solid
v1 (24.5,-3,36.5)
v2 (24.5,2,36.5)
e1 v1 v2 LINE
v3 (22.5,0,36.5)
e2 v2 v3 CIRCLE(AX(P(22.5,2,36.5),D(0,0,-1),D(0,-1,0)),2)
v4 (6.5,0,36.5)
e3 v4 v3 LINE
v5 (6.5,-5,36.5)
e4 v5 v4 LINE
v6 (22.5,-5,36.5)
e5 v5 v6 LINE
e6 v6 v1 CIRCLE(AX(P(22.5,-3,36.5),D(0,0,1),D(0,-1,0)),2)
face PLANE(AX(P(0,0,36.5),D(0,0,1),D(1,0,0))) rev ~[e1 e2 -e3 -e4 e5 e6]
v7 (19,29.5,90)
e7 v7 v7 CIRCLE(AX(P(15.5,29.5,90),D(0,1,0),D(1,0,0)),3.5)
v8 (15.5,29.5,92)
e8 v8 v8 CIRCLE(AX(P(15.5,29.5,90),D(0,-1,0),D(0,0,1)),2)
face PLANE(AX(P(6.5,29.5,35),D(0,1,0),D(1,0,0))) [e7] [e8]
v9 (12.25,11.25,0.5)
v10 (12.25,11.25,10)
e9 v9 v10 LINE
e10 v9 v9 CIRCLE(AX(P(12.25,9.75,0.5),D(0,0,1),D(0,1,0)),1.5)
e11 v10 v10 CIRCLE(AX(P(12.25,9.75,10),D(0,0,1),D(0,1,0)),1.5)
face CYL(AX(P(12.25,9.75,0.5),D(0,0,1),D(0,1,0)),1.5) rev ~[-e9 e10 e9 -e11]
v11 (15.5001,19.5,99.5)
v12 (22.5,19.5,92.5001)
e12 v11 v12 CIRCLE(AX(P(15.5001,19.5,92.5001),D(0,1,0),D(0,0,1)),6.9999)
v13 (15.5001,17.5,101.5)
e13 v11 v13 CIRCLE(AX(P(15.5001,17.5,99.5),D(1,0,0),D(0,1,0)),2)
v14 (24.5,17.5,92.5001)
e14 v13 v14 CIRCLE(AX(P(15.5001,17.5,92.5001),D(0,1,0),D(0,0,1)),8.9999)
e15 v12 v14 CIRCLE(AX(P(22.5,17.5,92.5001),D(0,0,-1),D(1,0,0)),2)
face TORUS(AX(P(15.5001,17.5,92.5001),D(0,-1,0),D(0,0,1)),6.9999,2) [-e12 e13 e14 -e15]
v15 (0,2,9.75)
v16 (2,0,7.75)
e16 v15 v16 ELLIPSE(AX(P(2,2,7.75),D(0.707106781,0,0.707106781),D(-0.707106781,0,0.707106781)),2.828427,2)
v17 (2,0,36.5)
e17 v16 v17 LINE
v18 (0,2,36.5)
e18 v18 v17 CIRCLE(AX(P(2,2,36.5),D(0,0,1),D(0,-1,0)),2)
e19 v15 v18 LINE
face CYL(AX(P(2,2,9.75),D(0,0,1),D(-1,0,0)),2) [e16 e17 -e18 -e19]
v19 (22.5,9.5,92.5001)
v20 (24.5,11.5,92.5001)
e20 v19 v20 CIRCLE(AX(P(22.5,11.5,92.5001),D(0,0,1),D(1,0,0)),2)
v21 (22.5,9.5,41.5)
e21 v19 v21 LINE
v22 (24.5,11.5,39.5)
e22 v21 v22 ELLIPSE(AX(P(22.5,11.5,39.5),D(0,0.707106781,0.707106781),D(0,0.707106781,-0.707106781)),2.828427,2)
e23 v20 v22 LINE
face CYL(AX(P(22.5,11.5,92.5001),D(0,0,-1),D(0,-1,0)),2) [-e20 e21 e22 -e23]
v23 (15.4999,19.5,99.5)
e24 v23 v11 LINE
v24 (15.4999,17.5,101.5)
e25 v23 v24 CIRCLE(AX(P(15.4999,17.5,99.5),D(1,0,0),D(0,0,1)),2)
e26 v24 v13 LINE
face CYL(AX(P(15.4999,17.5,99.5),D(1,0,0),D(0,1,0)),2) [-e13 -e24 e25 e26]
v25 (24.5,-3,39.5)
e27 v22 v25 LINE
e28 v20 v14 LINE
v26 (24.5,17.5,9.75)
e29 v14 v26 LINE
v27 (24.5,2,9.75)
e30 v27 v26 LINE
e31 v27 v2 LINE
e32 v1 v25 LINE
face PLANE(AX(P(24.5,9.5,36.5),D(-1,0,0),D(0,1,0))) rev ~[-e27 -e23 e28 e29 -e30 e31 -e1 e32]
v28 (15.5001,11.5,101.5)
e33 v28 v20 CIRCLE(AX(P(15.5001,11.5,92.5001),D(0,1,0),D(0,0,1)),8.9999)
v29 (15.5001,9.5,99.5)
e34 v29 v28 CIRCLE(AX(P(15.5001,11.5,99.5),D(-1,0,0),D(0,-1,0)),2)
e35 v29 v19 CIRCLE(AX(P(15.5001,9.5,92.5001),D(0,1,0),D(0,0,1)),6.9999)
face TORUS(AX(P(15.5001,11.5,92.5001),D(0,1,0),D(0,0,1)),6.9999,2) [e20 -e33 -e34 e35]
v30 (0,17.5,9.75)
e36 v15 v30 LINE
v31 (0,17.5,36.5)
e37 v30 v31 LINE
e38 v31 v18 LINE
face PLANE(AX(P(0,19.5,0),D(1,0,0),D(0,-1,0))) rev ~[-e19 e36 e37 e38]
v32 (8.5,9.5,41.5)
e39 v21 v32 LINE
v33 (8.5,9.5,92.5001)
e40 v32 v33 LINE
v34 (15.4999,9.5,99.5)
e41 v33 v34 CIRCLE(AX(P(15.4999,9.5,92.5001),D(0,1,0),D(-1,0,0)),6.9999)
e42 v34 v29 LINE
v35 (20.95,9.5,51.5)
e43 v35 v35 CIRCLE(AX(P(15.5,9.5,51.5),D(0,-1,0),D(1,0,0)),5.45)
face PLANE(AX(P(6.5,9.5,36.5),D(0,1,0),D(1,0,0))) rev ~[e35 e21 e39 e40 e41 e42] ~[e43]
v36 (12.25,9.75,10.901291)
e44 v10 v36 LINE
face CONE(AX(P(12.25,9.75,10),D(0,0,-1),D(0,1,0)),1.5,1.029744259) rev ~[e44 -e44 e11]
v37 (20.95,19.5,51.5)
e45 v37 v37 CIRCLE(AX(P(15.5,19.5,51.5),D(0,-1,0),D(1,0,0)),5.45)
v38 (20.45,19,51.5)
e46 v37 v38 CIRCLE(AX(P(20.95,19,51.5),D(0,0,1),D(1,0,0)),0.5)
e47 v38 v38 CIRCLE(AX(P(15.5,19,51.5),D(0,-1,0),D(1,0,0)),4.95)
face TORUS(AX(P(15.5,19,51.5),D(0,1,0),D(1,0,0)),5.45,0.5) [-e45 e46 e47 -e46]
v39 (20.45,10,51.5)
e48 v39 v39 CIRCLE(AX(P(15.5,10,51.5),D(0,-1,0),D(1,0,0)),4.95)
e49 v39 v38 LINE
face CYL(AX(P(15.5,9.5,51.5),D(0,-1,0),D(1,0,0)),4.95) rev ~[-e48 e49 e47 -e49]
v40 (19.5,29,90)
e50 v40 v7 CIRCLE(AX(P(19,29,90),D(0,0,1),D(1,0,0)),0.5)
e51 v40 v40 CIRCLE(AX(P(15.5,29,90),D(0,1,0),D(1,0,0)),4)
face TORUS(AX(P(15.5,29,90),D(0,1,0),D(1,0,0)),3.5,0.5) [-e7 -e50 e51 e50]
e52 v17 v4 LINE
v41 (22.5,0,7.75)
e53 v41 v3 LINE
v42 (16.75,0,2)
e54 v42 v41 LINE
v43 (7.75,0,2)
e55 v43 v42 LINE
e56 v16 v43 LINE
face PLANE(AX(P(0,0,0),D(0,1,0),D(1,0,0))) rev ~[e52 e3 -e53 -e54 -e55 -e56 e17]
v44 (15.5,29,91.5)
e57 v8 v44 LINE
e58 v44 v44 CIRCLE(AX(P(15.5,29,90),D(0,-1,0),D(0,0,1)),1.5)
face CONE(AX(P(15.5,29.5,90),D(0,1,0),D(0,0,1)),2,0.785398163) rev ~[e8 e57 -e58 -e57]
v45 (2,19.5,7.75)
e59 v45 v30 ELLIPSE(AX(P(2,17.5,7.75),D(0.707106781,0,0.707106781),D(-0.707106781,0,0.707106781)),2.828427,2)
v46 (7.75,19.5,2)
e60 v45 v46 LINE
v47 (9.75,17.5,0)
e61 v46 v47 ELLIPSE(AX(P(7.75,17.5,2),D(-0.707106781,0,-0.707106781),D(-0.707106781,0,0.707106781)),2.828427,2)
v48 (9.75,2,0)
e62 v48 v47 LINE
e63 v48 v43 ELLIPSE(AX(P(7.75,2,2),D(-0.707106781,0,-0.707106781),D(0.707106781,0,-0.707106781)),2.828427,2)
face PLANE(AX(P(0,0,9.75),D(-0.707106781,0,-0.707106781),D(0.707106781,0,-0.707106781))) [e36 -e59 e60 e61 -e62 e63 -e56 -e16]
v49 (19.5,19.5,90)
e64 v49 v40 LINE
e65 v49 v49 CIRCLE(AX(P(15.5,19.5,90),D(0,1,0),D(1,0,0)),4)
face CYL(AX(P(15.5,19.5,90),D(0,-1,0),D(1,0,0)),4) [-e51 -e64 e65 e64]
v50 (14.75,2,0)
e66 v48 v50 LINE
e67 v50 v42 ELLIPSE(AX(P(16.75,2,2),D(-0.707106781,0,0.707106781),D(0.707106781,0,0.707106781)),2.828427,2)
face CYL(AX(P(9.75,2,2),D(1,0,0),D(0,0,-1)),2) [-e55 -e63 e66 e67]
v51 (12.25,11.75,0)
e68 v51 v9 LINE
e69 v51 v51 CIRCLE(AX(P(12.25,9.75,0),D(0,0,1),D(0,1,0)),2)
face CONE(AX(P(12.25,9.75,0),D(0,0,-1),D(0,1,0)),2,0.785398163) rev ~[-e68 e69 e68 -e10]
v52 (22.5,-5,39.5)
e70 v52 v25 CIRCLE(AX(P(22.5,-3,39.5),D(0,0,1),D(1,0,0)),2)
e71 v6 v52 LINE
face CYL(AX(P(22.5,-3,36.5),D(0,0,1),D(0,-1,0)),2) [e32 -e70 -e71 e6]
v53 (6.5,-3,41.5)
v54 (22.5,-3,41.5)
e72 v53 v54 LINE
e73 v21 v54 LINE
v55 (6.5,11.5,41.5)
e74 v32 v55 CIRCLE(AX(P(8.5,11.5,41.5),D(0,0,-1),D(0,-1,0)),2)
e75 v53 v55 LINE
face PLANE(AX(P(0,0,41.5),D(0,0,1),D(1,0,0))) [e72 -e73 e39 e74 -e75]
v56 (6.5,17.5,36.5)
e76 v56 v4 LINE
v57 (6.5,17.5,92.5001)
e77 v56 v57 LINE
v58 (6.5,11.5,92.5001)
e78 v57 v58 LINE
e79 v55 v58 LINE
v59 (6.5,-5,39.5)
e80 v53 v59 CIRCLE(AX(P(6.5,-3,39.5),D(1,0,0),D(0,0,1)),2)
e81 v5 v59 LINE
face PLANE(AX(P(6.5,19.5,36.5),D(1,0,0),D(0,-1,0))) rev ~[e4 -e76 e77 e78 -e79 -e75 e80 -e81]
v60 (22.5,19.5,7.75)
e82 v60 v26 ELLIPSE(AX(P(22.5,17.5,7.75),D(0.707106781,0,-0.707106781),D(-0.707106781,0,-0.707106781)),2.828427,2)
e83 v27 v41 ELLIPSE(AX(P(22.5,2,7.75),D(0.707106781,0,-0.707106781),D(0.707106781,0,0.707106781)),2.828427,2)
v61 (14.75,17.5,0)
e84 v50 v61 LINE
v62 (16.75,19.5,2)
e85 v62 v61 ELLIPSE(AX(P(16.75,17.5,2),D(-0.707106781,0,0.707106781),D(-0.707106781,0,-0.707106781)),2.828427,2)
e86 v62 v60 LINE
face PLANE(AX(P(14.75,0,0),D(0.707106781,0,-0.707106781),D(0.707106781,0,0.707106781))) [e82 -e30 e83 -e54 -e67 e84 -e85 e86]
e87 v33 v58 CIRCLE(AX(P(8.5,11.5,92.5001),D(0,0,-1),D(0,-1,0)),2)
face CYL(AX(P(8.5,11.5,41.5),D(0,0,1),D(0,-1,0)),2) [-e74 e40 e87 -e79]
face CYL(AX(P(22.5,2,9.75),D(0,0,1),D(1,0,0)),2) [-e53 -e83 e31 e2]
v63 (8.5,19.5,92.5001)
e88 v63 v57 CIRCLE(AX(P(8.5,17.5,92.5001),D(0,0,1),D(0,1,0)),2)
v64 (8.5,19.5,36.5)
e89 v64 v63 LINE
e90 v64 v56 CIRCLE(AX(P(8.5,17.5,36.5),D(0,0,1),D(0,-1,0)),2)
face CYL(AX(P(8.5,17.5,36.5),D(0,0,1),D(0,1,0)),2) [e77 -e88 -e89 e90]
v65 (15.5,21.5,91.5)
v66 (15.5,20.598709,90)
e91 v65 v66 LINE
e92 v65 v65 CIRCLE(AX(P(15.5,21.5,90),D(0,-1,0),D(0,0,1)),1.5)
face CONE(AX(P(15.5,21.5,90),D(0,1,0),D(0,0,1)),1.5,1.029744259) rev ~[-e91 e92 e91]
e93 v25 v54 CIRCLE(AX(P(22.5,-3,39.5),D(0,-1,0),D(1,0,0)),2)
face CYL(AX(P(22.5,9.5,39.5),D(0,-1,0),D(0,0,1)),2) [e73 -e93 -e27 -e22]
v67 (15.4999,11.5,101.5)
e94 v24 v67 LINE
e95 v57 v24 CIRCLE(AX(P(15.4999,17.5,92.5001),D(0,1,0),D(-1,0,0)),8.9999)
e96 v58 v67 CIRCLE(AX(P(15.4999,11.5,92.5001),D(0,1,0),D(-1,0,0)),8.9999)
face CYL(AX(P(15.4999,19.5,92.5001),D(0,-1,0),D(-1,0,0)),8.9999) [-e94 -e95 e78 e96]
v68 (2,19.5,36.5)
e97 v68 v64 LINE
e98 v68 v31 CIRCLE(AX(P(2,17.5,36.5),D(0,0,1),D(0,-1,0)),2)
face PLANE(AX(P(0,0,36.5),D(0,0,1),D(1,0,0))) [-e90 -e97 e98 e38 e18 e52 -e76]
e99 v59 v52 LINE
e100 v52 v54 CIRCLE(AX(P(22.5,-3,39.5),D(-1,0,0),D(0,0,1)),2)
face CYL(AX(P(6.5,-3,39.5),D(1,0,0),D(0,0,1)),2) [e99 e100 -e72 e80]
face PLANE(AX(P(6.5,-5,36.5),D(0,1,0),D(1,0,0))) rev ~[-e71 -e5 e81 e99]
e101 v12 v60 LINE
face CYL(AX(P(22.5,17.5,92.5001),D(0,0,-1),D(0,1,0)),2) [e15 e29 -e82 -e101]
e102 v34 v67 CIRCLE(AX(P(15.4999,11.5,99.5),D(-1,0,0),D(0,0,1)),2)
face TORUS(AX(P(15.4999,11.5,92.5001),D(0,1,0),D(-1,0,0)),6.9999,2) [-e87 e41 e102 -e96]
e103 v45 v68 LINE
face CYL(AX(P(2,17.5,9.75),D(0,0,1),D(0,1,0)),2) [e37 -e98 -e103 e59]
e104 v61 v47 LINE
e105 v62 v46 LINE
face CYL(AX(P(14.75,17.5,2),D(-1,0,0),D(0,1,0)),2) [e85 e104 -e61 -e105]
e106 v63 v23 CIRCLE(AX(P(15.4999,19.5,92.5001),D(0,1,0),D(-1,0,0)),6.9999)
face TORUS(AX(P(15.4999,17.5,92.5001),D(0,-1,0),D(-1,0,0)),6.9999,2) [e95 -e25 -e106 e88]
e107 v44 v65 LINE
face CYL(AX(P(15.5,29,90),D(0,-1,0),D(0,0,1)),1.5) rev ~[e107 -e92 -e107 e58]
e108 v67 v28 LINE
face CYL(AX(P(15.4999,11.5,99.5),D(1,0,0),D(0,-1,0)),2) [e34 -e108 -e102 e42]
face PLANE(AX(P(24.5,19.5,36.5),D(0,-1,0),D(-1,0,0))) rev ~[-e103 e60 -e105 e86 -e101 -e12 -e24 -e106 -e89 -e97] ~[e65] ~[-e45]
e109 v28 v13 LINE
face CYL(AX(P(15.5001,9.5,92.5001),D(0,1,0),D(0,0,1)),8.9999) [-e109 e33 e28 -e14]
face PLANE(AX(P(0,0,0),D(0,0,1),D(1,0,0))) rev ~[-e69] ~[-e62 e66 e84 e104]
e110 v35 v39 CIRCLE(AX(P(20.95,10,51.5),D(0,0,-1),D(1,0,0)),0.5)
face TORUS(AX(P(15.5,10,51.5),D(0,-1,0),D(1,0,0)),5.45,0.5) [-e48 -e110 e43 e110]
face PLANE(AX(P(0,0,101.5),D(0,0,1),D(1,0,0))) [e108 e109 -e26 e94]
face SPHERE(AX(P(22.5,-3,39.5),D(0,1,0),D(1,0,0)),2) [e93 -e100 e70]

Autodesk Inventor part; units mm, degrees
ref_plane "YZ Plane" through (0, 0, 0) normal (1, 0, 0) x (0, 1, 0)
ref_plane "XZ Plane" through (0, 0, 0) normal (0, 1, 0) x (-1, 0, 0)
ref_plane "XY Plane" through (0, 0, 0) normal (0, 0, 1) x (1, 0, 0)
sketch "Sketch1" plane through (0, 0, 0) normal (0, 0, 1) x (1, 0, 0)
  line L0 (0, 0) -> (24.5, 0)
  line L1 (24.5, 0) -> (24.5, 19.5)
  line L2 (24.5, 19.5) -> (0, 19.5)
  line L3 (0, 19.5) -> (0, 0)
  dimension "d0" = 19.5
  dimension "d1" = 24.5
extrude "Extrusion1" add sketch "Sketch1" along normal blind 36.5
sketch "Sketch12" plane through (0, 0, 0) normal (0, -1, 0) x (1, 0, 0)
  line L0 (24.5, 0) -> (24.5, 36.5) projected
  line L1 (0, 0) -> (0, 36.5) projected
  line L2 (24.5, 0) -> (24.5, 36.5) projected
  line L3 (24.5, 9.75) -> (24.5, 0)
  line L4 (0, 0) -> (24.5, 0) projected
  line L5 (14.75, 0) -> (24.5, 9.75)
  line L6 (0, 0) -> (0, 36.5) projected
  line L7 (0, 9.75) -> (9.75, 0)
  line L8 (9.75, 0) -> (0, 0)
  line L9 (0, 0) -> (0, 9.75)
  dimension "d75" = 5
  dimension "d76" = 45
  dimension "d77" = 45
  dimension "d79" = 9.75
extrude "Extrusion10" cut sketch "Sketch12" against normal through all
sketch "Sketch2" plane through (0, 0, 36.5) normal (0, 0, 1) x (1, 0, 0)
  line L0 (6.5, 9.5) -> (24.5, 9.5)
  line L1 (24.5, 9.5) -> (24.5, 19.5)
  line L2 (24.5, 19.5) -> (6.5, 19.5)
  line L3 (6.5, 19.5) -> (6.5, 9.5)
  line L4 (0, 0) -> (24.5, 0) projected
  line L5 (24.5, 0) -> (24.5, 19.5) projected
  line L6 (24.5, 19.5) -> (0, 19.5) projected
  dimension "d4" = 10
  dimension "d6" = 18
extrude "Extrusion2" add sketch "Sketch2" along normal blind 65
sketch "Sketch3" plane through (6.5, 9.5, 36.5) normal (0, -1, 0) x (1, 0, 0)
  circle A0 centre (9, 15) radius 4.95
  line L0 (18, 0) -> (18, 65) projected
  line L1 (18, 0) -> (0, 0) projected
  line L2 (0, 65) -> (18, 65) projected
  point P0 (-6.5, -36.5)
  point P1 (9, 65)
  dimension "d9" = 9.9
  dimension "d11" = 15
extrude "Extrusion3" cut sketch "Sketch3" against normal up to next
sketch "Sketch9" plane through (6.5, 19.5, 35) normal (0, 1, 0) x (1, 0, 0)
  circle A0 centre (9, -55) radius 4
  line L0 (18, -66.5) -> (0, -66.5) projected
  line L1 (18, 0) -> (0, 0) projected
  point P0 (-6.5, 35)
  point P1 (9, -66.5)
  dimension "d42" = 8
  dimension "d43" = 55
extrude "Extrusion9" add sketch "Sketch9" along normal blind 10
sketch "Sketch14" plane through (0, 0, 36.5) normal (0, 0, 1) x (1, 0, 0)
  line L0 (24.5, 9.5) -> (6.5, 9.5) projected
  line L1 (24.5, 9.5) -> (6.5, 9.5)
  line L2 (6.5, 9.5) -> (6.5, -5)
  line L3 (6.5, -5) -> (24.5, -5)
  line L4 (24.5, -5) -> (24.5, 9.5)
  line L5 (6.5, 9.5) -> (6.5, 19.5) projected
  line L6 (0, 0) -> (24.5, 0) projected
  dimension "d89" = 5
extrude "Extrusion11" add sketch "Sketch14" along normal blind 5
fillet "Fillet3" radius 9 2 edges at (24.5, 14.5, 101.5) (6.5, 14.5, 101.5)
fillet "Fillet1" radius 2 15 edges at (12.25, 0, 0) (24.5, 0, 23.125) (0, 0, 23.125) (0, 19.5, 23.125) (12.25, 19.5, 0) (21.864, 19.5, 98.864) (9.136, 19.5, 98.864) (6.5, 19.5, 64.5001) (21.864, 9.5, 98.864) (15.5, 9.5, 101.5) (24.5, 9.5, 67.0001) (6.5, 9.5, 67.0001) (24.5, 2.25, 41.5) (24.5, -5, 39) (15.5, -5, 41.5)
fillet "Fillet5" radius 0.5 2 edges at (10.55, 9.5, 51.5) (10.55, 19.5, 51.5)
fillet "Fillet6" radius 0.5 1 edges at (11.5, 29.5, 90)
sketch "Sketch10" plane through (15.5, 29.5, 90) normal (0, 1, 0) x (1, 0, 0)
  point P0 (-15.5, 90)
  point P1 (0, 0)
hole "Upper Arm Cap Hole" at (15.5, 29.5, 90) direction (0, -1, 0) diameter 3 depth 8 tip angle 118 countersink diameter 4 countersink angle 90
sketch "Sketch13" plane through (0, 0, 0) normal (0, 0, -1) x (-1, 0, 0)
  line L0 (-14.75, 17.5) -> (-14.75, 2) projected
  line L1 (-9.75, 2) -> (-14.75, 2) projected
  point P0 (0, 0)
  point P1 (-12.25, 9.75)
  point P2 (-14.75, 9.75)
  point P3 (-12.25, 2)
hole "Hole3" at (12.25, 9.75, 0) direction (0, 0, 1) diameter 3 depth 10 tip angle 118 countersink diameter 4 countersink angle 90
properties part number "Lift Mount Right"
